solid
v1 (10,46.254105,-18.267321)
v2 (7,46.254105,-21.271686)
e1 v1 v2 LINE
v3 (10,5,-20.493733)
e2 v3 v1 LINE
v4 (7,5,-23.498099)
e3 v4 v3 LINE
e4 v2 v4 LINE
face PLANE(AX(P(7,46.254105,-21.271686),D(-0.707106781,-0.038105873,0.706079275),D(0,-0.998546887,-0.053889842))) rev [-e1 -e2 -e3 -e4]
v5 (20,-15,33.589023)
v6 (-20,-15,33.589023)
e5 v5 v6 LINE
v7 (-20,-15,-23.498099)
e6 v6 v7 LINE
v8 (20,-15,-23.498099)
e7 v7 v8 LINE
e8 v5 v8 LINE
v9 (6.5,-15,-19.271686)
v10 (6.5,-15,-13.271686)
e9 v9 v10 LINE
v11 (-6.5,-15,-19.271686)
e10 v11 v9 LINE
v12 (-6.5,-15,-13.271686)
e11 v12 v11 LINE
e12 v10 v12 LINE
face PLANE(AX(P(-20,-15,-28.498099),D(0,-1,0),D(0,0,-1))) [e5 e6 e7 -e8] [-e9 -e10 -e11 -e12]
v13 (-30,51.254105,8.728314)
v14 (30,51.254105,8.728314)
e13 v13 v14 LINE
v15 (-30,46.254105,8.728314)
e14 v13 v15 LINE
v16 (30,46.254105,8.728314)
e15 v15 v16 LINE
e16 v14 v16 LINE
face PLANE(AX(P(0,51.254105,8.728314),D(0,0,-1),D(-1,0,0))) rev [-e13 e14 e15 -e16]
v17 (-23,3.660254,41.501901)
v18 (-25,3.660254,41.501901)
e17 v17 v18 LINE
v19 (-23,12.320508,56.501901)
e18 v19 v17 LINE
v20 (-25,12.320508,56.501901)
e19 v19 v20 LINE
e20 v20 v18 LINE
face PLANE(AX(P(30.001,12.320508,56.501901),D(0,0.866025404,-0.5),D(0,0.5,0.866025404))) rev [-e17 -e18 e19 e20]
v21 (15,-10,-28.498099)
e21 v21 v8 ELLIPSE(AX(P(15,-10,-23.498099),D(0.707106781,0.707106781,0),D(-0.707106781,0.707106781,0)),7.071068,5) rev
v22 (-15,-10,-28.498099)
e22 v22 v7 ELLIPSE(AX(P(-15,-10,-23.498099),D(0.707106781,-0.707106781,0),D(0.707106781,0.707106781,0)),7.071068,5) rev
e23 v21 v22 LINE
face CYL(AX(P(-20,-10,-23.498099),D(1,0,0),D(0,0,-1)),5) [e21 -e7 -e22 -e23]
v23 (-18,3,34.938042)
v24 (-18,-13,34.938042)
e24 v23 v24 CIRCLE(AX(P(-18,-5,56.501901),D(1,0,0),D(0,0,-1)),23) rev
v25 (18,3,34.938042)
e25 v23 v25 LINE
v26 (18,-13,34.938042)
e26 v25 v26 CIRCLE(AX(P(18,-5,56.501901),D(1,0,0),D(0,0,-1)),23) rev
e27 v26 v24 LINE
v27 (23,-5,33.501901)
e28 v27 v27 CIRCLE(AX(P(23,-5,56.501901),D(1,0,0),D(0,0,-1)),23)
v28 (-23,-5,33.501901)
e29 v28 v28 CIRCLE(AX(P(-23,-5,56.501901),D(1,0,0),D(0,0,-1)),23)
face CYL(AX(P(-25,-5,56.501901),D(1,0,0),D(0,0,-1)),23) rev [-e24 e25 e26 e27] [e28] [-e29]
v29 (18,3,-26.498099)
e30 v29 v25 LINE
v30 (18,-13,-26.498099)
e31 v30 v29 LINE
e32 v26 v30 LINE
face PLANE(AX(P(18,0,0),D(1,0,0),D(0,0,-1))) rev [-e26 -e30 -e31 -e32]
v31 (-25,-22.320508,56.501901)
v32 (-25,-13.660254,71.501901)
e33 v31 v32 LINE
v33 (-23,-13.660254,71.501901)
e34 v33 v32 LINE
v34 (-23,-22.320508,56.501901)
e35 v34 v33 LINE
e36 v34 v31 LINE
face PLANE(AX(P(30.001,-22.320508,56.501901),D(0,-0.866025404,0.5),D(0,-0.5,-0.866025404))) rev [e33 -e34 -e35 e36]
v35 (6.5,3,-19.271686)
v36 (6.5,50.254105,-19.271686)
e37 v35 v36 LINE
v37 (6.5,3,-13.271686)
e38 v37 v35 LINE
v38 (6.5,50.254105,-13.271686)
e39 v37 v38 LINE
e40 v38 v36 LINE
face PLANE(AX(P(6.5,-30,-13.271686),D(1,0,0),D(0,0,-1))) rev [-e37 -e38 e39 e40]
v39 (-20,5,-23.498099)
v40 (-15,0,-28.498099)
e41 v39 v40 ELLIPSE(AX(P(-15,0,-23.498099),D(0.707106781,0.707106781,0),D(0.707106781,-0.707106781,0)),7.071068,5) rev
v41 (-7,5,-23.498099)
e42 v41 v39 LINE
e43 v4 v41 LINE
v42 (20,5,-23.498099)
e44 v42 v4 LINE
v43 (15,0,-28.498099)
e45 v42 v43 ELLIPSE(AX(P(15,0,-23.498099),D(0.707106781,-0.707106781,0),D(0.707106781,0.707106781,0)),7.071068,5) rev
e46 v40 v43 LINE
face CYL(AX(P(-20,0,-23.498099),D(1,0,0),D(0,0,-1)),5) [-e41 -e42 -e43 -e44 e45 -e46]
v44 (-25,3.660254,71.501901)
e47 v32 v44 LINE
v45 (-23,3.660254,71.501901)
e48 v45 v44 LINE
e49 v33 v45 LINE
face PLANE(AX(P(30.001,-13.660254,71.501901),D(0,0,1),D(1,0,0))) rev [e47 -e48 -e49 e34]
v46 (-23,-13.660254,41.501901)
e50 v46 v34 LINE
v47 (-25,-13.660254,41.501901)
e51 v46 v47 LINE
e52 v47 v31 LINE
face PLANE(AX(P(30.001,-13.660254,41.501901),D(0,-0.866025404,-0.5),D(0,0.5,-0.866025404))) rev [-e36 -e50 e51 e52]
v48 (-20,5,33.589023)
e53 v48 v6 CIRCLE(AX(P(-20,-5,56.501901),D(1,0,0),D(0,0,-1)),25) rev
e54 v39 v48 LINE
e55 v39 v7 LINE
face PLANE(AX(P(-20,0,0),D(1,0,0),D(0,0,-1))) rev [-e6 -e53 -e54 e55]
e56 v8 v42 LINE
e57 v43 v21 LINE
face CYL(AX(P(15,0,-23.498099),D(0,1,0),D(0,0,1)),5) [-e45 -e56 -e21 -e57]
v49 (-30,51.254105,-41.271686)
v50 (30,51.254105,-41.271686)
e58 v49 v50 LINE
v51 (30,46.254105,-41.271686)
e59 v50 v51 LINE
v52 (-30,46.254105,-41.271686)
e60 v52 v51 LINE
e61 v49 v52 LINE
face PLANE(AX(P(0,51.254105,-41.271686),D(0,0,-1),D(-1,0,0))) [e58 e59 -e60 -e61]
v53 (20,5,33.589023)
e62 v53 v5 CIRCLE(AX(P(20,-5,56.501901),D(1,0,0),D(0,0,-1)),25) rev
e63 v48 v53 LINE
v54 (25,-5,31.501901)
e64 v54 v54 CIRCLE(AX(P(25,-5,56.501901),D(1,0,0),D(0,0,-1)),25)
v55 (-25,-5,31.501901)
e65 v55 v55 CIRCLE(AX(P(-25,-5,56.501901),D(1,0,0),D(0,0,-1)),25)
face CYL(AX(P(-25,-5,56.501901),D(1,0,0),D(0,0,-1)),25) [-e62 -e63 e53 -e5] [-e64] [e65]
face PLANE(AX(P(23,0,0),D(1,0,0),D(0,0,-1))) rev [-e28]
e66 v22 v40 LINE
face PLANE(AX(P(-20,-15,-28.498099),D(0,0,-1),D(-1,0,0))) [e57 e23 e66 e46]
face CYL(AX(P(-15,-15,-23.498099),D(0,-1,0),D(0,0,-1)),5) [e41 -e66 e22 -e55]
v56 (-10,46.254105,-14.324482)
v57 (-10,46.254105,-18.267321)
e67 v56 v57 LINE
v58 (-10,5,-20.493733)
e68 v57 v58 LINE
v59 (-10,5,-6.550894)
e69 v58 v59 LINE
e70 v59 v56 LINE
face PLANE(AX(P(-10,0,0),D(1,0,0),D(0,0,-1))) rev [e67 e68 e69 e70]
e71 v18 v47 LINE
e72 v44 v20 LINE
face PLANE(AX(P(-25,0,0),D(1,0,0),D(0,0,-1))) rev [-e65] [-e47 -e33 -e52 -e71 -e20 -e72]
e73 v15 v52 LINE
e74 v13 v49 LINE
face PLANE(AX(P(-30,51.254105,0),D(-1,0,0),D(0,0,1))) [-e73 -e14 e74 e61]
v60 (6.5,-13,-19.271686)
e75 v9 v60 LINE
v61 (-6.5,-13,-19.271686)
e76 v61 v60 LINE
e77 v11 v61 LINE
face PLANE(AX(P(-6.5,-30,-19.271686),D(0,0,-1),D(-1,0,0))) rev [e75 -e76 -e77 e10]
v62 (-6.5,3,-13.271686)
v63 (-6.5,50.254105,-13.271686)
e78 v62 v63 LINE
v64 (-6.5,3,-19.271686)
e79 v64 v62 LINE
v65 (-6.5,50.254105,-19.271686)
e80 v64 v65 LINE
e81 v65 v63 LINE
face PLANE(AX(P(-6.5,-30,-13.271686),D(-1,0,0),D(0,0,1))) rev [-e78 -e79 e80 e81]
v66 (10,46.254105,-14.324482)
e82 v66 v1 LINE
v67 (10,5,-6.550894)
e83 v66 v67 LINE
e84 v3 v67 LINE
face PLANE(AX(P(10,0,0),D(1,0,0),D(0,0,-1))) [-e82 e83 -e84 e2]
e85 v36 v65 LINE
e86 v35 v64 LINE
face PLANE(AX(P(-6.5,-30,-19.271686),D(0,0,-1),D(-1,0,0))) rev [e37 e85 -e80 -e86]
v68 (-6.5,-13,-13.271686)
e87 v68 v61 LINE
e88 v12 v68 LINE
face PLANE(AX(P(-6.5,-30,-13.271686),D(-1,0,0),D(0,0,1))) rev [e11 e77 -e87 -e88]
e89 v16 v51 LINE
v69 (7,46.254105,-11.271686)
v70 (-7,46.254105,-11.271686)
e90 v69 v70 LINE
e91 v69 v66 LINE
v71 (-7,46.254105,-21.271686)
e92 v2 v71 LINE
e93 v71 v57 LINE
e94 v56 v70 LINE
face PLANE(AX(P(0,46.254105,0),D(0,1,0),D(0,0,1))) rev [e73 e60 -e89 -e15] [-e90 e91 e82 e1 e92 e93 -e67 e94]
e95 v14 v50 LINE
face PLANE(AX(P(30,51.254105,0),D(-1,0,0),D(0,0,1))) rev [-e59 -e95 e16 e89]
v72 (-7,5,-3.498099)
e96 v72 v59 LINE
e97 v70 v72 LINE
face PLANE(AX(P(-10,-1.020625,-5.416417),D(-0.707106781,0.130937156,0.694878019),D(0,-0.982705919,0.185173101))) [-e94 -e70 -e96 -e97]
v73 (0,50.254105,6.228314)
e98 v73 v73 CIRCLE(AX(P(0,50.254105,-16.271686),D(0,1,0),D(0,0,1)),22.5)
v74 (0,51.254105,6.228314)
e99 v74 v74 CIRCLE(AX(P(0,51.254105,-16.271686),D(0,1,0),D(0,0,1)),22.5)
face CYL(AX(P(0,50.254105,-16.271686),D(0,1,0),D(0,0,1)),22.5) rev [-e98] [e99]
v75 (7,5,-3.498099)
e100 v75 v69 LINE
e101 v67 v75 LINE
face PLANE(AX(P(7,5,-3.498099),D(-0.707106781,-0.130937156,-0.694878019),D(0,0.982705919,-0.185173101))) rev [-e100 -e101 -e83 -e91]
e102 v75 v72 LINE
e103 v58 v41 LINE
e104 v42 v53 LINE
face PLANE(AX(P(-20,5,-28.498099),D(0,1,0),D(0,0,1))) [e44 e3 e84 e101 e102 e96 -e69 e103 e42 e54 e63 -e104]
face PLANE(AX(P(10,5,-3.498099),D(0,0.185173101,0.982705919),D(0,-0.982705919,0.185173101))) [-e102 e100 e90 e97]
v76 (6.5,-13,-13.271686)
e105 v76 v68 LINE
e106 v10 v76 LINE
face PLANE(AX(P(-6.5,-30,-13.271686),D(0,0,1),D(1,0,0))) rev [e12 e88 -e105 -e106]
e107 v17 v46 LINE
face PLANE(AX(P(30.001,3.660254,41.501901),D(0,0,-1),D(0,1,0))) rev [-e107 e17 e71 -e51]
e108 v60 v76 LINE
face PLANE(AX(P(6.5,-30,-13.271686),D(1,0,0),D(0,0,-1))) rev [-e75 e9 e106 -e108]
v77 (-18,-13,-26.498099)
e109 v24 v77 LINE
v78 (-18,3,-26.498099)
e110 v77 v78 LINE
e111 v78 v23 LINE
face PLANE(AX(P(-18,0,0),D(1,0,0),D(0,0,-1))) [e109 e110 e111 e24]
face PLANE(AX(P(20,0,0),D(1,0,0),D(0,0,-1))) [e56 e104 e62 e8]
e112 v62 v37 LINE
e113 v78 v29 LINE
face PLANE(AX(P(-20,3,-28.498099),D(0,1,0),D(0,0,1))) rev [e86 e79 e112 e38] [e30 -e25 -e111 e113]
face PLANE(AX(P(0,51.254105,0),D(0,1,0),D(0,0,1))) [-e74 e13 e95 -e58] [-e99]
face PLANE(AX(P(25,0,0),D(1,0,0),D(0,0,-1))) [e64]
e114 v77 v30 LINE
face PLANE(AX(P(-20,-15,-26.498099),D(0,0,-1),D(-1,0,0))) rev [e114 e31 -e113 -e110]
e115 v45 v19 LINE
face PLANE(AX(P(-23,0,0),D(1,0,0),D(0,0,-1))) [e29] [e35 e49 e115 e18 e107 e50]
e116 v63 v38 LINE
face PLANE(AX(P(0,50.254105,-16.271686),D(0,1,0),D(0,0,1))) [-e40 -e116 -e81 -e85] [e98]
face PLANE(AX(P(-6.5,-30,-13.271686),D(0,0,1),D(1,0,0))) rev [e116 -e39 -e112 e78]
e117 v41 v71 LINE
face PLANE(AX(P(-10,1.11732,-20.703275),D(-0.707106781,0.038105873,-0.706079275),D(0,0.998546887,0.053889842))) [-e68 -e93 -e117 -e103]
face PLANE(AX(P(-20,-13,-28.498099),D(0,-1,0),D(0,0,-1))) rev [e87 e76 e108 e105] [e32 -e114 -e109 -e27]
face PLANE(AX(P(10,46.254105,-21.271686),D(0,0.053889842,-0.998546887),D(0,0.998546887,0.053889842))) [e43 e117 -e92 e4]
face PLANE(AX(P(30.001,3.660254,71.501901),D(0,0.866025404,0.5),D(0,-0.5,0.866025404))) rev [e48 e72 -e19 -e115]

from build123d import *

# Parameters (mm, degrees)
BOSS_EXTRUDE1_DEPTH      = 25
BOSS_EXTRUDE1_DEPTH_BACK = 25
SKETCH1_R                = 25
BOSS_EXTRUDE4_DEPTH      = 20
BOSS_EXTRUDE4_DEPTH_BACK = 20
SKETCH9_W                = 85
SKETCH9_H                = 20
SHELL3_START             = -18
SHELL3_DEPTH             = 36
SHELL3_START_2           = -23
SHELL3_2_OUTLINE_R       = 23
SHELL3_2_DEPTH           = 46
FILLET2_R                = 5
BOSS_EXTRUDE5_DEPTH      = 10
BOSS_EXTRUDE5_DEPTH_BACK = 10
SKETCH5_W                = 60
SKETCH5_H                = 50
BOSS_EXTRUDE3_DEPTH      = 5
CUT_EXTRUDE2_REACH       = 112.881
CHAMFER2_SIZE            = 3
SKETCH13_R               = 22.5
CUT_EXTRUDE4_DEPTH       = 1
SKETCH15_W               = 13
SKETCH15_H               = 6
CUT_EXTRUDE10_DEPTH      = 119.931868873


# Read off the part's stored shape, not the designer's step: Shell3
with BuildPart() as part:
    # Sketch1 → Boss-Extrude1 (new, two sides: drawn at the far end of the back side and taken through both)
    with BuildSketch(Plane(origin=(0, 0, 0), x_dir=(0, 0, -1), z_dir=(1, 0, 0)).offset(-BOSS_EXTRUDE1_DEPTH_BACK)):
        with Locations((-56.501901141, -5)):
            Circle(SKETCH1_R)
    extrude(amount=BOSS_EXTRUDE1_DEPTH + BOSS_EXTRUDE1_DEPTH_BACK)

    # Sketch9 → Boss-Extrude4 (add, two sides: drawn at the far end of the back side and taken through both)
    with BuildSketch(Plane(origin=(0, 0, 0), x_dir=(0, 0, -1), z_dir=(1, 0, 0)).offset(-BOSS_EXTRUDE4_DEPTH_BACK)):
        with Locations((-14.001901141, -5)):
            Rectangle(SKETCH9_W, SKETCH9_H)
    extrude(amount=BOSS_EXTRUDE4_DEPTH + BOSS_EXTRUDE4_DEPTH_BACK)

    # Shell3 outline → Shell3 (cut)
    with BuildSketch(Plane.YZ.offset(SHELL3_START)):
        with BuildLine():
            ThreePointArc((3, 34.938042488), (-5, 79.501901141), (-13, 34.938042488))
            Line((-13, 34.938042488), (-13, -26.498098859))
            Line((-13, -26.498098859), (3, -26.498098859))
            Line((3, -26.498098859), (3, 34.938042488))
        make_face()
    extrude(amount=SHELL3_DEPTH, mode=Mode.SUBTRACT)

    # Shell3 2 outline → Shell3 2 (cut)
    with BuildSketch(Plane.YZ.offset(SHELL3_START_2)):
        with Locations((-5, 56.501901141)):
            Circle(SHELL3_2_OUTLINE_R)
    extrude(amount=SHELL3_2_DEPTH, mode=Mode.SUBTRACT)

    # Fillet2
    fillet2_edges = [part.edges().sort_by_distance(p)[0] for p in [
        (0, 5, -28.498098859),
        (-20, -5, -28.498098859),
        (0, -15, -28.498098859),
        (20, -5, -28.498098859),
    ]]
    fillet(fillet2_edges, radius=FILLET2_R)

    # Sketch11 → Boss-Extrude5 (add, two sides: drawn at the far end of the back side and taken through both)
    with BuildSketch(Plane.ZY.offset(-BOSS_EXTRUDE5_DEPTH_BACK)):
        Polygon((-3.498098859, 5), (-11.271686446, 46.254104782), (-21.271686446, 46.254104782), (-23.498098859, 5), align=None)
    extrude(amount=BOSS_EXTRUDE5_DEPTH + BOSS_EXTRUDE5_DEPTH_BACK)

    # Sketch5 → Boss-Extrude3 (add)
    with BuildSketch(Plane(origin=(0, 46.254104782, 0), x_dir=(1, 0, 0), z_dir=(0, 1, 0))):
        with Locations((0, 16.271686446)):
            Rectangle(SKETCH5_W, SKETCH5_H)
    extrude(amount=BOSS_EXTRUDE3_DEPTH)

    # Sketch8 → Cut-Extrude2 (cut, up to next)
    with BuildSketch(Plane.ZY.offset(25), mode=Mode.PRIVATE) as cut_extrude2_sk1:
        Polygon((56.501901141, 12.320508076), (41.501901141, 3.660254038), (41.501901141, -13.660254038), (56.501901141, -22.320508076), (71.501901141, -13.660254038), (71.501901141, 3.660254038), align=None)
    cut_extrude2_tool1 = extrude(cut_extrude2_sk1.sketch, amount=-CUT_EXTRUDE2_REACH, mode=Mode.PRIVATE) & part.part
    add(cut_extrude2_tool1.solids().sort_by_distance((-25, -5, 56.501901))[0], mode=Mode.SUBTRACT)

    # Chamfer2
    chamfer2_edges = [part.edges().sort_by_distance(p)[0] for p in [
        (10, 25.627052391, -22.384892652),
        (10, 25.627052391, -7.384892652),
        (-10, 25.627052391, -7.384892652),
        (-10, 25.627052391, -22.384892652),
    ]]
    chamfer(chamfer2_edges, length=CHAMFER2_SIZE)

    # Sketch13 → Cut-Extrude4 (cut)
    with BuildSketch(Plane(origin=(0, 51.254104782, 0), x_dir=(1, 0, 0), z_dir=(0, 1, 0))):
        with Locations(Location((0, 16.271686446, 0), (0, 0, 270))):
            Circle(SKETCH13_R)
    extrude(amount=-CUT_EXTRUDE4_DEPTH, mode=Mode.SUBTRACT)

    # Sketch15 → Cut-Extrude10 (cut, through all)
    with BuildSketch(Plane(origin=(0, 51.254104782, 0), x_dir=(1, 0, 0), z_dir=(0, 1, 0))):
        with Locations((0, 16.271686446)):
            Rectangle(SKETCH15_W, SKETCH15_H)
    extrude(amount=-CUT_EXTRUDE10_DEPTH, mode=Mode.SUBTRACT)


solid = part.part
